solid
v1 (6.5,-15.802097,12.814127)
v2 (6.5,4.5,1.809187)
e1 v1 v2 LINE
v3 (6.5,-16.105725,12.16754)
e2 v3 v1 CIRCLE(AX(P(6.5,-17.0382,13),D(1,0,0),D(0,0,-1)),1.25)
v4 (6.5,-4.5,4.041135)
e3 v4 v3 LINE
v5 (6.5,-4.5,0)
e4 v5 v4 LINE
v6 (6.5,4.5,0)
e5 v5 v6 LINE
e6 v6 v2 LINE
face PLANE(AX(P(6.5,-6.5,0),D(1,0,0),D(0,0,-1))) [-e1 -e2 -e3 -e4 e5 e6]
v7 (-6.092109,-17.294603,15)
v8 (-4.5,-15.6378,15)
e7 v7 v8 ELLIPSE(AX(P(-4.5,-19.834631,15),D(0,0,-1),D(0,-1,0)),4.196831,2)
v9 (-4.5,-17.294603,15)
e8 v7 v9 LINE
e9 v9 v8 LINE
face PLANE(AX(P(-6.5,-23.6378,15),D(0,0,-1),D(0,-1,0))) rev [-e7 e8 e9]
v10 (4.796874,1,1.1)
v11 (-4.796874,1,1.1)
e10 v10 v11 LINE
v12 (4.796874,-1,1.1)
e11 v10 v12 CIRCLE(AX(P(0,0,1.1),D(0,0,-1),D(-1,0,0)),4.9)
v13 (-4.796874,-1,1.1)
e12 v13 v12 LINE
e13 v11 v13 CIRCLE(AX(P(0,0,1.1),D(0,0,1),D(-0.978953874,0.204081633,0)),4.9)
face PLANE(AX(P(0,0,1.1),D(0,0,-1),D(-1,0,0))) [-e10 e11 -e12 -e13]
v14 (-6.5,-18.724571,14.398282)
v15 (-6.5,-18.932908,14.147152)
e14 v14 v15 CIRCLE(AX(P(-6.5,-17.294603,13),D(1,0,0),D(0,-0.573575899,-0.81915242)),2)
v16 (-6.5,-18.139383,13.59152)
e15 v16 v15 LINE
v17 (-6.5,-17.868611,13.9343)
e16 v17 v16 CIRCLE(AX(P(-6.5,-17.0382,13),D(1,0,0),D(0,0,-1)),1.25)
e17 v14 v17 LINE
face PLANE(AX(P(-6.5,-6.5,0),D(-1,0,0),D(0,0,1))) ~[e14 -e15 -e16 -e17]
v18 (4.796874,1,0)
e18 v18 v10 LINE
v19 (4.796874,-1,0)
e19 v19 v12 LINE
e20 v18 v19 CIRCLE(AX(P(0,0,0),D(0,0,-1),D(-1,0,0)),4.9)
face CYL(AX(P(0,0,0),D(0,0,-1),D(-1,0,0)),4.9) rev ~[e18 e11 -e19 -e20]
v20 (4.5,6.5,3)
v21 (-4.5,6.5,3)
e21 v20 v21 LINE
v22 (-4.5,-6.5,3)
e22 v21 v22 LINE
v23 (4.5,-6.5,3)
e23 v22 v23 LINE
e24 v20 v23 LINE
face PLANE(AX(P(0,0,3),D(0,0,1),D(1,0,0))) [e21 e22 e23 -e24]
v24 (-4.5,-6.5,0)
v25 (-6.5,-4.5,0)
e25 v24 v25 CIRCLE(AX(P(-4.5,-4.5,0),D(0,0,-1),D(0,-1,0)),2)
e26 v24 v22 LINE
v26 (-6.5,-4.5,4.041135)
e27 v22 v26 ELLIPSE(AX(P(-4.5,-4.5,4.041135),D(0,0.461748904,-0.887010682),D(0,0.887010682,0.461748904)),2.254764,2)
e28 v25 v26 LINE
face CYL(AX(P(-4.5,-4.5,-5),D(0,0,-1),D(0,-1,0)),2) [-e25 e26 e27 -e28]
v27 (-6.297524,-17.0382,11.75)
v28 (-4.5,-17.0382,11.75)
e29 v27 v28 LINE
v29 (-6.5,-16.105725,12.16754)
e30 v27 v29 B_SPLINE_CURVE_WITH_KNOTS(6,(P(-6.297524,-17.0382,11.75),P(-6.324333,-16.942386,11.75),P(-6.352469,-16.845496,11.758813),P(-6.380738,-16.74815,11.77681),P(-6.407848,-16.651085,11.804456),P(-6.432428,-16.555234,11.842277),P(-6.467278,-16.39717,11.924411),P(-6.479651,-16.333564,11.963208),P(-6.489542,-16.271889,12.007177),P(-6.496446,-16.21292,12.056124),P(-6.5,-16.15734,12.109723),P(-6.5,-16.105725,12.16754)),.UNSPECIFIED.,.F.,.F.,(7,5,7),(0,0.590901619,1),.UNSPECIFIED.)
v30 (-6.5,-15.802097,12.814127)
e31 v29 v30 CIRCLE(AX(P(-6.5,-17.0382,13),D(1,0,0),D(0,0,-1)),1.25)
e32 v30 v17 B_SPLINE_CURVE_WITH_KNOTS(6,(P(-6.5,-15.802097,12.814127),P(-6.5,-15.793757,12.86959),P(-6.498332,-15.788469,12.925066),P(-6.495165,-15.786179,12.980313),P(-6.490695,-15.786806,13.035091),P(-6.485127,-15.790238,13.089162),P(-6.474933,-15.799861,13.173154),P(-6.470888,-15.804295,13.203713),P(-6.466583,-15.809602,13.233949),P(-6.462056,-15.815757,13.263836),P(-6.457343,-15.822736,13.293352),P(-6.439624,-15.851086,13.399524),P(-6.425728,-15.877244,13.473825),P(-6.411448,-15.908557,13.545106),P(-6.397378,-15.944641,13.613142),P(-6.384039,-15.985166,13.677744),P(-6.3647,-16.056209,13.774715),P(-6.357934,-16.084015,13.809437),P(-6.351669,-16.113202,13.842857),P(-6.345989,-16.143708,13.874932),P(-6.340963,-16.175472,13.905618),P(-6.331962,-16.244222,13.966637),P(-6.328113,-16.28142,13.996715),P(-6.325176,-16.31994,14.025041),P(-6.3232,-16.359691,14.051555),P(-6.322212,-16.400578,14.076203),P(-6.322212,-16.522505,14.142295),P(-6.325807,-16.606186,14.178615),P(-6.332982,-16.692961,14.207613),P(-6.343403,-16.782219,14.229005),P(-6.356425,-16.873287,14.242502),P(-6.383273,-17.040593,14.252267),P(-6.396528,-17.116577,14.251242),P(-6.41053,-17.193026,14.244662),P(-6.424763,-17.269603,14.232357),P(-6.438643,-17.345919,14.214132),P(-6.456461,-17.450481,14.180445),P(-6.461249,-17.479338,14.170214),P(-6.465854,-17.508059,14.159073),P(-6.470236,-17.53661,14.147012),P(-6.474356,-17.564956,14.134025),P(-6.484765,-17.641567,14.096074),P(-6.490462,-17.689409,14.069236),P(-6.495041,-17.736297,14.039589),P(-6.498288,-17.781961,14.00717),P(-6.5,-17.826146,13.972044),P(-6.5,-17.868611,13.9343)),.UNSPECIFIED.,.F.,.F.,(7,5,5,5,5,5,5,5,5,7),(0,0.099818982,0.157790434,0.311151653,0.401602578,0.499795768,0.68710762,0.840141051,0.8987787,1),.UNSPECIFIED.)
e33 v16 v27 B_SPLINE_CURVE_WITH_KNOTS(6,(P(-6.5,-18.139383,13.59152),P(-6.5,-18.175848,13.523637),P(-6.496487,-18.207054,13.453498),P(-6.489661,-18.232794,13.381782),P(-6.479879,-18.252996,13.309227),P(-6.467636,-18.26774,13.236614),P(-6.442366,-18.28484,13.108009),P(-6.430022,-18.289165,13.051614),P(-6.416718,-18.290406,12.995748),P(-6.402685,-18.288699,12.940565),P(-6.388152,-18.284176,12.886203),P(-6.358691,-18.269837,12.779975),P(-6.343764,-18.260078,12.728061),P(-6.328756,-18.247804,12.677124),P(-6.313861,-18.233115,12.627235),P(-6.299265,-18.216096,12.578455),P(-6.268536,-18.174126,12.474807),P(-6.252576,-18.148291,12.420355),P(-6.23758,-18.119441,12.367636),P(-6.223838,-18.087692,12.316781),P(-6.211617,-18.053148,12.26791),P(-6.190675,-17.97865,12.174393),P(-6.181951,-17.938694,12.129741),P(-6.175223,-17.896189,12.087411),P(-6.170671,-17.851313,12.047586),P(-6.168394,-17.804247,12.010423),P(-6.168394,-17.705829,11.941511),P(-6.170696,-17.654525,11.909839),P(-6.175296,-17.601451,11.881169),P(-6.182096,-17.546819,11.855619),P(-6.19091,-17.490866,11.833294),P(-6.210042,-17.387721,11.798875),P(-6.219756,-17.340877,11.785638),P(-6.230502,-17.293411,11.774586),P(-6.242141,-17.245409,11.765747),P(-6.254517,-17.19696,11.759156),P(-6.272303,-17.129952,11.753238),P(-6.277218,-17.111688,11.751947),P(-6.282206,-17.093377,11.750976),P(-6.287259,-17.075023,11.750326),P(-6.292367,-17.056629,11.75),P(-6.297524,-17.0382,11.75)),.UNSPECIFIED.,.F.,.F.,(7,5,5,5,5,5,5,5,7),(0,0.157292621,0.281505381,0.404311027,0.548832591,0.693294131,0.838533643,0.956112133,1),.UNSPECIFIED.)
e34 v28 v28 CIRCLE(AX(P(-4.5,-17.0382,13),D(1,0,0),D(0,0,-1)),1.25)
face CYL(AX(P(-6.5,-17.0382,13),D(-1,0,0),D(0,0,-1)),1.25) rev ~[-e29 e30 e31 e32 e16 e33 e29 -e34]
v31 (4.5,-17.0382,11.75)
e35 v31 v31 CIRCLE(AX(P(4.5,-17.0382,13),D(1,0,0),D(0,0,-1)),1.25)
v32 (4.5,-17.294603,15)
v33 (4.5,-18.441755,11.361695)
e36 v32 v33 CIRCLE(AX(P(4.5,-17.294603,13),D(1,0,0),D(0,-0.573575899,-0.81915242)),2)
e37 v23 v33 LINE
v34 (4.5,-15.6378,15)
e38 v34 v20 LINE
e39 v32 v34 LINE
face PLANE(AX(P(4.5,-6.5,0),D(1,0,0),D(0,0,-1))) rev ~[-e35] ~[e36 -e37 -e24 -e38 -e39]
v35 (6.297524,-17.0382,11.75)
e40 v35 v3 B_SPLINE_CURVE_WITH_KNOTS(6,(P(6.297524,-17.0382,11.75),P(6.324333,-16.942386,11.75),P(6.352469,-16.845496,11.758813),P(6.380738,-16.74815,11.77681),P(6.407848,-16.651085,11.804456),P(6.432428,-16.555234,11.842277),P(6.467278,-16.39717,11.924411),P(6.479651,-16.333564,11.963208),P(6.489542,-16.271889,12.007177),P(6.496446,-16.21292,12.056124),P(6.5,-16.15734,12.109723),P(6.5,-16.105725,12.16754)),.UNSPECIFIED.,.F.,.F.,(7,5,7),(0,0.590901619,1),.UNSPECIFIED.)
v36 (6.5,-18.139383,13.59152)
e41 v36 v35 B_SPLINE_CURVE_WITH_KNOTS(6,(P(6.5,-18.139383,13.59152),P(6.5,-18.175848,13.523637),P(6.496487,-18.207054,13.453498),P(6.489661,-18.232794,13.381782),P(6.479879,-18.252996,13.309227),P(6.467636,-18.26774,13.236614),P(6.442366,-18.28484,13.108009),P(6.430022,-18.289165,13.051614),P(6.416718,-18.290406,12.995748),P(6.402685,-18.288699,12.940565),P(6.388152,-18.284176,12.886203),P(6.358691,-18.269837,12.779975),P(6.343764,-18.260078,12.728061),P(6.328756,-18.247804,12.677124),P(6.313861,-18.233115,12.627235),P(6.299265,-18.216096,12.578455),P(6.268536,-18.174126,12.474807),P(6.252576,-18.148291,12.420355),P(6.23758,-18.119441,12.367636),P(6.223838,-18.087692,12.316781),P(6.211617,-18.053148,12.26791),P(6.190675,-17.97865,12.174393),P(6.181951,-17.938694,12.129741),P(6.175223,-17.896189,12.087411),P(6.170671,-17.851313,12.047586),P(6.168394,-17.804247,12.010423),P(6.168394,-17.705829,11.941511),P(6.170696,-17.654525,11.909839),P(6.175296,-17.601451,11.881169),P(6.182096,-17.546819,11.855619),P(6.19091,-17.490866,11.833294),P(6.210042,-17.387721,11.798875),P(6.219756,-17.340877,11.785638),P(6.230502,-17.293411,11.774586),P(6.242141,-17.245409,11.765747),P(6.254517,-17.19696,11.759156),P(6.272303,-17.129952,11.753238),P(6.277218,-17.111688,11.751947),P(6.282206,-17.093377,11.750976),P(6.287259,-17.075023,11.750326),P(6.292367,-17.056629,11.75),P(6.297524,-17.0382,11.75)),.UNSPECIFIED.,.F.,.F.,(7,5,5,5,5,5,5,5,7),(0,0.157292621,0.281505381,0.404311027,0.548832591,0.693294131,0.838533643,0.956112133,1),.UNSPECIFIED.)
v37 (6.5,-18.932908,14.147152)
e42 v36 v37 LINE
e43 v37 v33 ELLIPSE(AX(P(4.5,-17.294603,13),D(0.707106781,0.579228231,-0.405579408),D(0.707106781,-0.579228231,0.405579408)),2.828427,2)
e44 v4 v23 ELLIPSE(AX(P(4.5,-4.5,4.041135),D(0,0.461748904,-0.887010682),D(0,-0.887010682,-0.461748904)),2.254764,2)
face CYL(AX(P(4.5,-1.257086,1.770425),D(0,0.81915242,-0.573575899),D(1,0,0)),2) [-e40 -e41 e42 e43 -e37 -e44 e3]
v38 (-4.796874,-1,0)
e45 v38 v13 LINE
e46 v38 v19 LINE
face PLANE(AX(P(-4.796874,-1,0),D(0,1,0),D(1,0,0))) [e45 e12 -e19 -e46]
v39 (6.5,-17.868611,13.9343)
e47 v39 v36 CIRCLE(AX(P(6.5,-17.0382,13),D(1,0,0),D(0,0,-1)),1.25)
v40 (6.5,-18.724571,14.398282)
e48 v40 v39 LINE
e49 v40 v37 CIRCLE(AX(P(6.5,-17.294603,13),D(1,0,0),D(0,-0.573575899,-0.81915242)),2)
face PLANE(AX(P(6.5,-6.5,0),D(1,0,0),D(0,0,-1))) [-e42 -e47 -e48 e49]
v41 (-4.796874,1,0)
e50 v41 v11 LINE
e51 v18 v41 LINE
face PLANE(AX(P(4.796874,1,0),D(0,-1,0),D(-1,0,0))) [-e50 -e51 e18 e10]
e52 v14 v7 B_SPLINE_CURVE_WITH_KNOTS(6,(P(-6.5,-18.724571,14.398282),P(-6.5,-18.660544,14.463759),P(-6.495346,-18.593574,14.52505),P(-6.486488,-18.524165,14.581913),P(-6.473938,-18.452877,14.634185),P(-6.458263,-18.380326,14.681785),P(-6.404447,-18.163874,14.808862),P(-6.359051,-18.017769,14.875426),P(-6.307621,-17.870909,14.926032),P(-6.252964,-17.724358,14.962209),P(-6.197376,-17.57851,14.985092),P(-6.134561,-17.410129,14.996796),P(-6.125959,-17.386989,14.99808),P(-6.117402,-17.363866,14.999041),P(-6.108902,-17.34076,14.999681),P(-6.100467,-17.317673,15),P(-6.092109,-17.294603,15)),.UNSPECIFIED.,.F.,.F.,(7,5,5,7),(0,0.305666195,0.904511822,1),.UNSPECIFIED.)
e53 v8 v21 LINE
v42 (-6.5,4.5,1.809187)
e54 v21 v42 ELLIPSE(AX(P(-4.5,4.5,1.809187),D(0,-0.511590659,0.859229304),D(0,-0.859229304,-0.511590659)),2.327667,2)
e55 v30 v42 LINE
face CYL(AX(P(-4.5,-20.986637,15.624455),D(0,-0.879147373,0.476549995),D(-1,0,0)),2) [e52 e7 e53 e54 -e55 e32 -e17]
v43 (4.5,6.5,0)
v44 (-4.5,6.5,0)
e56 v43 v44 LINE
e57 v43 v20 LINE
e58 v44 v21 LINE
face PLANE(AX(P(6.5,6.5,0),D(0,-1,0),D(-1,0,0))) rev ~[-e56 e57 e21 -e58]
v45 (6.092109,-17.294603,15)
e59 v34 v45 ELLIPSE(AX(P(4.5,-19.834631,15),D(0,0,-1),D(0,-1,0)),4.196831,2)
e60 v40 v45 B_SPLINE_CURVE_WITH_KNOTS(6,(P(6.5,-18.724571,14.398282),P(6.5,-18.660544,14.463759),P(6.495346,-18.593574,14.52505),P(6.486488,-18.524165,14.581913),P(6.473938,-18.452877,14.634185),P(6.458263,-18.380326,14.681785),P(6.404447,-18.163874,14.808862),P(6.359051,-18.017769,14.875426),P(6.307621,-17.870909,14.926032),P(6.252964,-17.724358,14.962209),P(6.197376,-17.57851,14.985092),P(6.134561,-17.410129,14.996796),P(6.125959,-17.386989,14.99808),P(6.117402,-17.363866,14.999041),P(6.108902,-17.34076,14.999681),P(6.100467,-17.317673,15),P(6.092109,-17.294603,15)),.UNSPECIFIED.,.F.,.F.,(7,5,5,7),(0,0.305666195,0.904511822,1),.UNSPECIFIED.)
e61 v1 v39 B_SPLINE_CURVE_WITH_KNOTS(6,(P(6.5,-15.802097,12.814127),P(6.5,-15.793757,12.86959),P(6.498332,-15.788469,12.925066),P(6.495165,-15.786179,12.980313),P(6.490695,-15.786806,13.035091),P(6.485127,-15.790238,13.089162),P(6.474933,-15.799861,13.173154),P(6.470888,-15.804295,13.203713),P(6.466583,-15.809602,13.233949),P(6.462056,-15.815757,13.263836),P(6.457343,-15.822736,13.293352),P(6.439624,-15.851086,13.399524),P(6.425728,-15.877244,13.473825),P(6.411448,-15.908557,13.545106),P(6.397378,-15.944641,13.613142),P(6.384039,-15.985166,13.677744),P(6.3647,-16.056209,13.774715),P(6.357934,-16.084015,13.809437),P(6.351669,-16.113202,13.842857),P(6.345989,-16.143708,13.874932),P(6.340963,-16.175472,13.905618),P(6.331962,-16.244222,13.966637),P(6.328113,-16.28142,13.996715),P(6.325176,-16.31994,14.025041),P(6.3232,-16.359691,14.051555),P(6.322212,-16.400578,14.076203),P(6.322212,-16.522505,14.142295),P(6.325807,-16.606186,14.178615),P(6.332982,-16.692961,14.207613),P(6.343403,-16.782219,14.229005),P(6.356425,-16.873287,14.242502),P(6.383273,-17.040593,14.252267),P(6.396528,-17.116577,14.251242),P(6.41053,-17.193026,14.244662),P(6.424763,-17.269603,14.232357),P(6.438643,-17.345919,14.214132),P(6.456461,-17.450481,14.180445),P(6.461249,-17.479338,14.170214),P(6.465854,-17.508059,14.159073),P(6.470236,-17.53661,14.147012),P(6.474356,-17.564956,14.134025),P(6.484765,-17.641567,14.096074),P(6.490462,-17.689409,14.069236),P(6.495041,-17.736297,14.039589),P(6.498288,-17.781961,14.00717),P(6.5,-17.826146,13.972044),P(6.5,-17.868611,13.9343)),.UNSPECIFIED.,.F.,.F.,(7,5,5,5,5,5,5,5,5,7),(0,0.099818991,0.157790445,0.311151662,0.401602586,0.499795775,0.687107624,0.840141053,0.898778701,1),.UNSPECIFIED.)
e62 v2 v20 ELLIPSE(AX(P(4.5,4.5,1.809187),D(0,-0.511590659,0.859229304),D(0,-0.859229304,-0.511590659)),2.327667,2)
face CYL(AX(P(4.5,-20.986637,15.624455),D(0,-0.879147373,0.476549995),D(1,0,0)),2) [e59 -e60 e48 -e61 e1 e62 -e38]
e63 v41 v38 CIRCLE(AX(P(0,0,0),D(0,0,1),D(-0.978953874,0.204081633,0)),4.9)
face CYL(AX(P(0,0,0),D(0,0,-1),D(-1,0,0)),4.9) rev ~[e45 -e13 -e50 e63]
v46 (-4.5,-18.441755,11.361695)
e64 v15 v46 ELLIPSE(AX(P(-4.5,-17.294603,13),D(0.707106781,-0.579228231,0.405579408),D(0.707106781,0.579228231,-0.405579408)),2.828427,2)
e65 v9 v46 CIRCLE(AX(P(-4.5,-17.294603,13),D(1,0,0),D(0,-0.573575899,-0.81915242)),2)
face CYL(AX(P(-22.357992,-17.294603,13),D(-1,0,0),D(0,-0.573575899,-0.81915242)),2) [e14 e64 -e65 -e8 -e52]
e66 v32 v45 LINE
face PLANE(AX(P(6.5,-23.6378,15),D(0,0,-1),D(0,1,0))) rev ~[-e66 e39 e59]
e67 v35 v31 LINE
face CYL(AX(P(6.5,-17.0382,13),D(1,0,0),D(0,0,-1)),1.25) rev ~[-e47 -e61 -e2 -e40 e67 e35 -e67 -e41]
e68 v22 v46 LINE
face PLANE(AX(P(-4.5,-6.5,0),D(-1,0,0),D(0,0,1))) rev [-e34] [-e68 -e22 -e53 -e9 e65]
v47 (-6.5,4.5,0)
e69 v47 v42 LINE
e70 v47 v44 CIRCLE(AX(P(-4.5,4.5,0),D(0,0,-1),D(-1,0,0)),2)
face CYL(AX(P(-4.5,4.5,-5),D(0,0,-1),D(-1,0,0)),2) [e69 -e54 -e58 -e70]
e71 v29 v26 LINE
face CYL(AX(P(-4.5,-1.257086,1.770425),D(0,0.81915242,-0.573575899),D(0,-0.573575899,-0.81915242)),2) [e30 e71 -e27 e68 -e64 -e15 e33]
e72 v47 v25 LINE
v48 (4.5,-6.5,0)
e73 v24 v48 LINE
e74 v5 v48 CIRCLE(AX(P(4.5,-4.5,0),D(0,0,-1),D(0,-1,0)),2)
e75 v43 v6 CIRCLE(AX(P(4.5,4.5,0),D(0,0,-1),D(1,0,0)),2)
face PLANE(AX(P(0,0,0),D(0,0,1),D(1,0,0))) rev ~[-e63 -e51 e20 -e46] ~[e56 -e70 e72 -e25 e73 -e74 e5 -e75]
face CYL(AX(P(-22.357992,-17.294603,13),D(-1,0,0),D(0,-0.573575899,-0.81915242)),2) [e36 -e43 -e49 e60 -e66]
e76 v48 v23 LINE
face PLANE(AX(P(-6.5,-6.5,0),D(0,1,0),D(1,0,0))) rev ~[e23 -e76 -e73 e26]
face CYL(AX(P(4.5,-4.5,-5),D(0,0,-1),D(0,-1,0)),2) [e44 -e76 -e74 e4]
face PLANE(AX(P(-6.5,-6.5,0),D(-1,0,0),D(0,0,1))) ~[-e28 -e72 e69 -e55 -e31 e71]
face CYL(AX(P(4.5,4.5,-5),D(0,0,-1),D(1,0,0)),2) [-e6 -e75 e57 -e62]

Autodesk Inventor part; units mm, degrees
ref_plane "YZ Plane" through (0, 0, 0) normal (1, 0, 0) x (0, 1, 0)
ref_plane "XZ Plane" through (0, 0, 0) normal (0, 1, 0) x (-1, 0, 0)
ref_plane "XY Plane" through (0, 0, 0) normal (0, 0, 1) x (1, 0, 0)
sketch "Sketch1" plane through (0, 0, 0) normal (0, 0, 1) x (1, 0, 0)
  line L0 (6.5, 6.5) -> (-6.5, 6.5)
  line L1 (-6.5, 6.5) -> (-6.5, -6.5)
  line L2 (-6.5, -6.5) -> (6.5, -6.5)
  line L3 (6.5, -6.5) -> (6.5, 6.5)
  line L4 (6.5, 6.5) -> (-6.5, -6.5) construction
  line L5 (-6.5, 6.5) -> (6.5, -6.5) construction
  point P0 (0, 0)
  point P1 (0, 0)
  dimension "d35" = 13
  dimension "d36" = 13
extrude "Extrusion1" add sketch "Sketch1" along normal blind 3
sketch "Sketch2" plane through (0, 0, 0) normal (0, 0, -1) x (-1, 0, 0)
  line L0 (-6.5, 1) -> (6.5, 1)
  line L1 (6.5, 1) -> (6.5, -1)
  line L2 (6.5, -1) -> (-6.5, -1)
  line L3 (-6.5, -1) -> (-6.5, 1)
  line L4 (-6.5, 1) -> (6.5, -1) construction
  line L5 (6.5, 1) -> (-6.5, -1) construction
  circle A0 centre (0, 0) radius 4.9
  point P0 (4.7969, 1)
  point P1 (-4.7969, 1)
  point P2 (-4.7969, -1)
  point P3 (4.7969, -1)
  dimension "d3" = 2
  dimension "d4" = 13
  dimension "d57" = 9.8
extrude "Extrusion2" cut sketch "Sketch2" against normal blind 1.1 contours L0 A0 L2
sketch "Sketch22" plane through (6.5, -6.5, 0) normal (1, 0, 0) x (0, 0, -1)
  line L0 (0, 13) -> (-3, 13) projected
  line L1 (-3, 13) -> (-3, 0) projected
  line L2 (-3, 13) -> (-3, 0)
  line L3 (-3, 0) -> (-15, -17.1378)
  line L4 (-15, -17.1378) -> (-15, -9.1378)
  line L5 (-15, -9.1378) -> (-3, 13)
  line L6 (0, 0) -> (0, 13) projected
  point P0 (0, 6.5)
  point P1 (0, 6.5)
  dimension "d131" = 145
  dimension "d132" = 8
  dimension "d133" = 15
extrude "Extrusion20" add sketch "Sketch22" against normal blind 2
sketch "Sketch24" plane through (6.5, -6.5, 0) normal (1, 0, 0) x (0, 0, -1)
  circle A0 centre (-13, -10.5382) radius 1.25
  line L0 (0, 0) -> (0, 13) projected
  line L1 (-3, 13) -> (-15, -9.1378) projected
  line L2 (-15, -17.1378) -> (-3, 0) projected
  line L3 (-14.7588, -9.3067) -> (-11.2412, -11.7697) construction
  line L4 (-15, -17.1378) -> (-15, -9.1378) projected
  point P0 (0, 6.5)
  point P1 (0, 6.5)
  dimension "d141" = 2.5
  dimension "d142" = 13
  dimension "d149" = 90
extrude "Extrusion22" cut sketch "Sketch24" against normal blind 2
mirror "Mirror2" about plane through (0, 0, 0) normal (1, 0, 0) of "Extrusion20", "Extrusion22"
fillet "Fillet6" radius 2 10 edges at (-5.5, -23.6378, 15) (5.5, -23.6378, 15) (-6.5, -4.5689, 9) (6.5, -4.5689, 9) (-6.5, 6.5, 1.5) (-6.5, -15.0689, 9) (-6.5, -6.5, 1.5) (6.5, -15.0689, 9) (6.5, -6.5, 1.5) (6.5, 6.5, 1.5)
properties part number "PodstawkaKola"
